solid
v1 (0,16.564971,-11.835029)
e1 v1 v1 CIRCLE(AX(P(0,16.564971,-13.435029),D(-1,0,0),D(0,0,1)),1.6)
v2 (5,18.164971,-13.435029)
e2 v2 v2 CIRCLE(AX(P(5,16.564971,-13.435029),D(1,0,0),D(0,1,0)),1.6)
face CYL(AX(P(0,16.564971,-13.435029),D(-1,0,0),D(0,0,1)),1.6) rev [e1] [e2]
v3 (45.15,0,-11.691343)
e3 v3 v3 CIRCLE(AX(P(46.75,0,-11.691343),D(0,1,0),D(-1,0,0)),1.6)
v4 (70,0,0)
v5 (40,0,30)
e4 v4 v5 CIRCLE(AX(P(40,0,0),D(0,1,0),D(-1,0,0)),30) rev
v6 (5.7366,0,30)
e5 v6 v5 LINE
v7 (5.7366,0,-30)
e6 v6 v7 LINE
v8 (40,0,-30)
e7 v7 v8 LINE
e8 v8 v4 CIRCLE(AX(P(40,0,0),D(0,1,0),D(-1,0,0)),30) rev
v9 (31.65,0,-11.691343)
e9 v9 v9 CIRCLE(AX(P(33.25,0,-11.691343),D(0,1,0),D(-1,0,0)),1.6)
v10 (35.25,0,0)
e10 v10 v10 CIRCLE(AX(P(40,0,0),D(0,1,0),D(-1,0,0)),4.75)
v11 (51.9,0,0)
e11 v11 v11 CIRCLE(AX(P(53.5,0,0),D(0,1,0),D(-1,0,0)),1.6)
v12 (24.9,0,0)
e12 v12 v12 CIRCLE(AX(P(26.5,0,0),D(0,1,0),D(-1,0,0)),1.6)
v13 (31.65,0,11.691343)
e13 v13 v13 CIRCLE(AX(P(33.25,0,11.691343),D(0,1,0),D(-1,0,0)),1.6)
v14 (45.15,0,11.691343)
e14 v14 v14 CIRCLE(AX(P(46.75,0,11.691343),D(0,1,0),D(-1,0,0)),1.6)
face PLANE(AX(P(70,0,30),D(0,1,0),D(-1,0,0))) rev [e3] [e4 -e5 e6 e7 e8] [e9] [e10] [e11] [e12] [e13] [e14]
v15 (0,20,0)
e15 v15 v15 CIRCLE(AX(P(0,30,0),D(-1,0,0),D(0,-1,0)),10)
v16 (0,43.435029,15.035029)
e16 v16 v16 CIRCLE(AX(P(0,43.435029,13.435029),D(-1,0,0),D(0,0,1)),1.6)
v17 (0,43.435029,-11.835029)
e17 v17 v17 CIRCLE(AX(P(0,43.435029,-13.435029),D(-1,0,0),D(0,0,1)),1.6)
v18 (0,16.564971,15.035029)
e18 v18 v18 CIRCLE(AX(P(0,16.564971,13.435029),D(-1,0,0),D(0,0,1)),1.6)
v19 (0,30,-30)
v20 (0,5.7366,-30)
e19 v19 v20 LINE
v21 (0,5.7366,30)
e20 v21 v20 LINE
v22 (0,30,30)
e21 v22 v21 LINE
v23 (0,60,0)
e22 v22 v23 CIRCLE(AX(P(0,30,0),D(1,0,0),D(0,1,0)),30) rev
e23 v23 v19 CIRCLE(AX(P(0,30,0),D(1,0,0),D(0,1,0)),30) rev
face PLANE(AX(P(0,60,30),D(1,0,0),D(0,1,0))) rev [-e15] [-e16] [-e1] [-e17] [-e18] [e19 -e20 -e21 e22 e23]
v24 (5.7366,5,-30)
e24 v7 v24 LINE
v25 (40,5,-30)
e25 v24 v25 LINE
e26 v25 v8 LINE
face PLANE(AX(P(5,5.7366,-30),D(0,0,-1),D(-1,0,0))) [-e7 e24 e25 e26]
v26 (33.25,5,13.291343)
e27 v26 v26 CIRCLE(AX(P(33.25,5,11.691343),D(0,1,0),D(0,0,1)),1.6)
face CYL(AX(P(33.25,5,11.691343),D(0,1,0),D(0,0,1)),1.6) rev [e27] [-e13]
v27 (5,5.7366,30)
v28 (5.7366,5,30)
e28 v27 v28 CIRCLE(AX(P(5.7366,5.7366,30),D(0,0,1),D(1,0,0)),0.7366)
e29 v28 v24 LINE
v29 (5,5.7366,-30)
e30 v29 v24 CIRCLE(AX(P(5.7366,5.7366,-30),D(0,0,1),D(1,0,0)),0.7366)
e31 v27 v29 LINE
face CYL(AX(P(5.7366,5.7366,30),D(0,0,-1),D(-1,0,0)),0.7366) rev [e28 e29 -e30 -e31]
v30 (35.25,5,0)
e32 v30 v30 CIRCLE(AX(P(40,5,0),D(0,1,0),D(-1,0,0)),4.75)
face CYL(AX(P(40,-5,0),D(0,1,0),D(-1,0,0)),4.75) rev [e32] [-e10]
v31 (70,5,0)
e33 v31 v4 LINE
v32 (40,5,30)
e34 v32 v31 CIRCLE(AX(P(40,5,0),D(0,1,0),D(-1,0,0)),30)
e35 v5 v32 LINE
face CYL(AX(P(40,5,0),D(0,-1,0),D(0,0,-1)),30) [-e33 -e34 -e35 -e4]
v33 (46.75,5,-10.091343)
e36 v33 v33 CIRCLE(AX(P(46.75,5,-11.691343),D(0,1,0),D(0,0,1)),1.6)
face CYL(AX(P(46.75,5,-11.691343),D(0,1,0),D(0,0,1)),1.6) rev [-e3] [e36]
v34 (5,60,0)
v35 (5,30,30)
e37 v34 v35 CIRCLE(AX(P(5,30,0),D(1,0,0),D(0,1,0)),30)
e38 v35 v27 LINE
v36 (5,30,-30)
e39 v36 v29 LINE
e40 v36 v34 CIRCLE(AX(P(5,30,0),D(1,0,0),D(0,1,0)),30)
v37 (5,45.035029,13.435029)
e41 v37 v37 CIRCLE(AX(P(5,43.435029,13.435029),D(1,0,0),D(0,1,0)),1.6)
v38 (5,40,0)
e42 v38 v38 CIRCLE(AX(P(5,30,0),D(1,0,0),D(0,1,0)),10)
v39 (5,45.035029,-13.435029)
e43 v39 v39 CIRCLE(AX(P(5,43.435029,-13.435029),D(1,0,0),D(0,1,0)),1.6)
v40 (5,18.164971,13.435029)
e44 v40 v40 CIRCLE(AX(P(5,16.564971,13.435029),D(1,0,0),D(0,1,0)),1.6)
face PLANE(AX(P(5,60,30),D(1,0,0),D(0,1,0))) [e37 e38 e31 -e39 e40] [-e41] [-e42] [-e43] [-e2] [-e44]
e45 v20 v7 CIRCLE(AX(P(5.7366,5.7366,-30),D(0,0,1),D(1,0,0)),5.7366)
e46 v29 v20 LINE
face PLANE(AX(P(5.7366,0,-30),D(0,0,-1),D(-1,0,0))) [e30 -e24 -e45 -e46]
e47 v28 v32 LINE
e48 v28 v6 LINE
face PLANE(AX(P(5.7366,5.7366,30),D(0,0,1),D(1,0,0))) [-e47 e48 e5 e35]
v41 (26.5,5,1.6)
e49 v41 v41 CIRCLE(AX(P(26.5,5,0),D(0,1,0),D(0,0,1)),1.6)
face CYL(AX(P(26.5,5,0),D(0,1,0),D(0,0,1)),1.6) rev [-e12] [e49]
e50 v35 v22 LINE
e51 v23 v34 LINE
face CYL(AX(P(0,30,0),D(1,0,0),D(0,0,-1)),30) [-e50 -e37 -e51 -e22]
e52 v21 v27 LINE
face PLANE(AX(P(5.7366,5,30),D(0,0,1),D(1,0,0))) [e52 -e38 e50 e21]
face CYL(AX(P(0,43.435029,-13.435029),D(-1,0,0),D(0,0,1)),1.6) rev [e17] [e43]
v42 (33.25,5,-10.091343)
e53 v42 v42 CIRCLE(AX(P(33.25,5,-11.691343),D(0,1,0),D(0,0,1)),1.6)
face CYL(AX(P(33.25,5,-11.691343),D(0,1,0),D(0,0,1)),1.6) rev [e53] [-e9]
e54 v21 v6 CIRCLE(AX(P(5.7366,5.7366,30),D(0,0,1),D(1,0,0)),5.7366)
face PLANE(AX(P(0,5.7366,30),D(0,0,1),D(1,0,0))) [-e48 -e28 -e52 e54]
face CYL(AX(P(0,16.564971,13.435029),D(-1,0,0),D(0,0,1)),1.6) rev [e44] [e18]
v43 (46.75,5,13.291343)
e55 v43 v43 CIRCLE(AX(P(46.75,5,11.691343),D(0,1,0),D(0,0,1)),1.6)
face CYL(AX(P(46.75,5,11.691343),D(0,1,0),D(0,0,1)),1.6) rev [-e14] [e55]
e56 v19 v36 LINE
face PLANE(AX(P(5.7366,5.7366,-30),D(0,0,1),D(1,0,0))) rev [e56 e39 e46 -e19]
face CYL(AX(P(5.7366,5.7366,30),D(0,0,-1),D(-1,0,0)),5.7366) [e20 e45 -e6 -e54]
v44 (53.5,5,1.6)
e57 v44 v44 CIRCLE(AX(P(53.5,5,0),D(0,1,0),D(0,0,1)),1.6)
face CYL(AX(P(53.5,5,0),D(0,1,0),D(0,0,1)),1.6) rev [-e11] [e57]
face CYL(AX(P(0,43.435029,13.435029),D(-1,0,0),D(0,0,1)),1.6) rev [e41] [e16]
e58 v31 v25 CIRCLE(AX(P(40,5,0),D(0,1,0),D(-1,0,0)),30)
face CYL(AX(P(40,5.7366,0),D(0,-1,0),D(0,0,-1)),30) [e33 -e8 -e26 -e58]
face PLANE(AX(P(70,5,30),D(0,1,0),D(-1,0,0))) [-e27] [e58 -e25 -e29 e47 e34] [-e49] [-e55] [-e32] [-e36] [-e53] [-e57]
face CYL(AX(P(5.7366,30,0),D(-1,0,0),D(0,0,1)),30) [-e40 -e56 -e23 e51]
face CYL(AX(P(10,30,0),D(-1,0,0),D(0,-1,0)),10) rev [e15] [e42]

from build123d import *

# Parameters (mm, degrees)
SM_BASE_FLANGE_1_DEPTH  = 30
SKETCH_2_R              = 4.75
CUT_EXTRUDE_1_DEPTH     = 10
HOLE_WIZARD_1_OUTLINE_R = 1.6
HOLE_WIZARD_1_DEPTH     = 5
SKETCH_5_R              = 10
CUT_EXTRUDE_2_DEPTH     = 10
HOLE_WIZARD_2_OUTLINE_R = 1.6
HOLE_WIZARD_2_DEPTH     = 5
FILLET_1_R              = 30


# Read off the part's stored shape, not the designer's step: 孔1, 孔2
# Sheet-metal steps are written as plain solids
with BuildPart() as part:
    # Sketch 1 → 基体-法兰1 (new, symmetric)
    with BuildSketch(Plane.XY):
        with BuildLine():
            Line((70, 0), (5.7366, 0))
            ThreePointArc((5.7366, 0), (1.680211239, 1.680211239), (0, 5.7366))
            Line((0, 5.7366), (0, 60))
            Line((0, 60), (5, 60))
            Line((5, 60), (5, 5.7366))
            ThreePointArc((5, 5.7366), (5.215745145, 5.215745145), (5.7366, 5))
            Line((5.7366, 5), (70, 5))
            Line((70, 5), (70, 0))
        make_face()
    extrude(amount=SM_BASE_FLANGE_1_DEPTH, both=True)

    # Sketch 2 → 切除-拉伸1 (cut)
    with BuildSketch(Plane(origin=(0, 5, 0), x_dir=(1, 0, 0), z_dir=(0, 1, 0))):
        with Locations(Location((40, 0, 0), (0, 0, 180))):
            Circle(SKETCH_2_R)
    extrude(amount=-CUT_EXTRUDE_1_DEPTH, mode=Mode.SUBTRACT)

    # 孔1 outline → 孔1 (cut)
    with BuildSketch(Plane(origin=(0, 0, 0), x_dir=(1, 0, 0), z_dir=(0, 1, 0))):
        with Locations((33.25, -11.691342951)):
            Circle(HOLE_WIZARD_1_OUTLINE_R)
        with Locations((26.5, 0)):
            Circle(HOLE_WIZARD_1_OUTLINE_R)
        with Locations((33.25, 11.691342951)):
            Circle(HOLE_WIZARD_1_OUTLINE_R)
        with Locations((46.75, 11.691342951)):
            Circle(HOLE_WIZARD_1_OUTLINE_R)
        with Locations((53.5, 0)):
            Circle(HOLE_WIZARD_1_OUTLINE_R)
        with Locations((46.75, -11.691342951)):
            Circle(HOLE_WIZARD_1_OUTLINE_R)
    extrude(amount=HOLE_WIZARD_1_DEPTH, mode=Mode.SUBTRACT)

    # 草图5 → 切除-拉伸2 (cut)
    with BuildSketch(Plane.ZY):
        with Locations(Location((0, 30, 0), (0, 0, 270))):
            Circle(SKETCH_5_R)
    extrude(amount=-CUT_EXTRUDE_2_DEPTH, mode=Mode.SUBTRACT)

    # 孔2 outline → 孔2 (cut)
    with BuildSketch(Plane.YZ):
        with Locations((16.564971157, 13.435028843)):
            Circle(HOLE_WIZARD_2_OUTLINE_R)
        with Locations((16.564971157, -13.435028843)):
            Circle(HOLE_WIZARD_2_OUTLINE_R)
        with Locations((43.435028843, -13.435028843)):
            Circle(HOLE_WIZARD_2_OUTLINE_R)
        with Locations((43.435028843, 13.435028843)):
            Circle(HOLE_WIZARD_2_OUTLINE_R)
    extrude(amount=HOLE_WIZARD_2_DEPTH, mode=Mode.SUBTRACT)

    # 圆角1
    fillet_1_edges = [part.edges().sort_by_distance(p)[0] for p in [
        (70, 2.5, -30),
        (70, 2.5, 30),
        (2.5, 60, -30),
        (2.5, 60, 30),
    ]]
    fillet(fillet_1_edges, radius=FILLET_1_R - 0.0001)  # a hair under: the kernel refuses the full size


solid = part.part
